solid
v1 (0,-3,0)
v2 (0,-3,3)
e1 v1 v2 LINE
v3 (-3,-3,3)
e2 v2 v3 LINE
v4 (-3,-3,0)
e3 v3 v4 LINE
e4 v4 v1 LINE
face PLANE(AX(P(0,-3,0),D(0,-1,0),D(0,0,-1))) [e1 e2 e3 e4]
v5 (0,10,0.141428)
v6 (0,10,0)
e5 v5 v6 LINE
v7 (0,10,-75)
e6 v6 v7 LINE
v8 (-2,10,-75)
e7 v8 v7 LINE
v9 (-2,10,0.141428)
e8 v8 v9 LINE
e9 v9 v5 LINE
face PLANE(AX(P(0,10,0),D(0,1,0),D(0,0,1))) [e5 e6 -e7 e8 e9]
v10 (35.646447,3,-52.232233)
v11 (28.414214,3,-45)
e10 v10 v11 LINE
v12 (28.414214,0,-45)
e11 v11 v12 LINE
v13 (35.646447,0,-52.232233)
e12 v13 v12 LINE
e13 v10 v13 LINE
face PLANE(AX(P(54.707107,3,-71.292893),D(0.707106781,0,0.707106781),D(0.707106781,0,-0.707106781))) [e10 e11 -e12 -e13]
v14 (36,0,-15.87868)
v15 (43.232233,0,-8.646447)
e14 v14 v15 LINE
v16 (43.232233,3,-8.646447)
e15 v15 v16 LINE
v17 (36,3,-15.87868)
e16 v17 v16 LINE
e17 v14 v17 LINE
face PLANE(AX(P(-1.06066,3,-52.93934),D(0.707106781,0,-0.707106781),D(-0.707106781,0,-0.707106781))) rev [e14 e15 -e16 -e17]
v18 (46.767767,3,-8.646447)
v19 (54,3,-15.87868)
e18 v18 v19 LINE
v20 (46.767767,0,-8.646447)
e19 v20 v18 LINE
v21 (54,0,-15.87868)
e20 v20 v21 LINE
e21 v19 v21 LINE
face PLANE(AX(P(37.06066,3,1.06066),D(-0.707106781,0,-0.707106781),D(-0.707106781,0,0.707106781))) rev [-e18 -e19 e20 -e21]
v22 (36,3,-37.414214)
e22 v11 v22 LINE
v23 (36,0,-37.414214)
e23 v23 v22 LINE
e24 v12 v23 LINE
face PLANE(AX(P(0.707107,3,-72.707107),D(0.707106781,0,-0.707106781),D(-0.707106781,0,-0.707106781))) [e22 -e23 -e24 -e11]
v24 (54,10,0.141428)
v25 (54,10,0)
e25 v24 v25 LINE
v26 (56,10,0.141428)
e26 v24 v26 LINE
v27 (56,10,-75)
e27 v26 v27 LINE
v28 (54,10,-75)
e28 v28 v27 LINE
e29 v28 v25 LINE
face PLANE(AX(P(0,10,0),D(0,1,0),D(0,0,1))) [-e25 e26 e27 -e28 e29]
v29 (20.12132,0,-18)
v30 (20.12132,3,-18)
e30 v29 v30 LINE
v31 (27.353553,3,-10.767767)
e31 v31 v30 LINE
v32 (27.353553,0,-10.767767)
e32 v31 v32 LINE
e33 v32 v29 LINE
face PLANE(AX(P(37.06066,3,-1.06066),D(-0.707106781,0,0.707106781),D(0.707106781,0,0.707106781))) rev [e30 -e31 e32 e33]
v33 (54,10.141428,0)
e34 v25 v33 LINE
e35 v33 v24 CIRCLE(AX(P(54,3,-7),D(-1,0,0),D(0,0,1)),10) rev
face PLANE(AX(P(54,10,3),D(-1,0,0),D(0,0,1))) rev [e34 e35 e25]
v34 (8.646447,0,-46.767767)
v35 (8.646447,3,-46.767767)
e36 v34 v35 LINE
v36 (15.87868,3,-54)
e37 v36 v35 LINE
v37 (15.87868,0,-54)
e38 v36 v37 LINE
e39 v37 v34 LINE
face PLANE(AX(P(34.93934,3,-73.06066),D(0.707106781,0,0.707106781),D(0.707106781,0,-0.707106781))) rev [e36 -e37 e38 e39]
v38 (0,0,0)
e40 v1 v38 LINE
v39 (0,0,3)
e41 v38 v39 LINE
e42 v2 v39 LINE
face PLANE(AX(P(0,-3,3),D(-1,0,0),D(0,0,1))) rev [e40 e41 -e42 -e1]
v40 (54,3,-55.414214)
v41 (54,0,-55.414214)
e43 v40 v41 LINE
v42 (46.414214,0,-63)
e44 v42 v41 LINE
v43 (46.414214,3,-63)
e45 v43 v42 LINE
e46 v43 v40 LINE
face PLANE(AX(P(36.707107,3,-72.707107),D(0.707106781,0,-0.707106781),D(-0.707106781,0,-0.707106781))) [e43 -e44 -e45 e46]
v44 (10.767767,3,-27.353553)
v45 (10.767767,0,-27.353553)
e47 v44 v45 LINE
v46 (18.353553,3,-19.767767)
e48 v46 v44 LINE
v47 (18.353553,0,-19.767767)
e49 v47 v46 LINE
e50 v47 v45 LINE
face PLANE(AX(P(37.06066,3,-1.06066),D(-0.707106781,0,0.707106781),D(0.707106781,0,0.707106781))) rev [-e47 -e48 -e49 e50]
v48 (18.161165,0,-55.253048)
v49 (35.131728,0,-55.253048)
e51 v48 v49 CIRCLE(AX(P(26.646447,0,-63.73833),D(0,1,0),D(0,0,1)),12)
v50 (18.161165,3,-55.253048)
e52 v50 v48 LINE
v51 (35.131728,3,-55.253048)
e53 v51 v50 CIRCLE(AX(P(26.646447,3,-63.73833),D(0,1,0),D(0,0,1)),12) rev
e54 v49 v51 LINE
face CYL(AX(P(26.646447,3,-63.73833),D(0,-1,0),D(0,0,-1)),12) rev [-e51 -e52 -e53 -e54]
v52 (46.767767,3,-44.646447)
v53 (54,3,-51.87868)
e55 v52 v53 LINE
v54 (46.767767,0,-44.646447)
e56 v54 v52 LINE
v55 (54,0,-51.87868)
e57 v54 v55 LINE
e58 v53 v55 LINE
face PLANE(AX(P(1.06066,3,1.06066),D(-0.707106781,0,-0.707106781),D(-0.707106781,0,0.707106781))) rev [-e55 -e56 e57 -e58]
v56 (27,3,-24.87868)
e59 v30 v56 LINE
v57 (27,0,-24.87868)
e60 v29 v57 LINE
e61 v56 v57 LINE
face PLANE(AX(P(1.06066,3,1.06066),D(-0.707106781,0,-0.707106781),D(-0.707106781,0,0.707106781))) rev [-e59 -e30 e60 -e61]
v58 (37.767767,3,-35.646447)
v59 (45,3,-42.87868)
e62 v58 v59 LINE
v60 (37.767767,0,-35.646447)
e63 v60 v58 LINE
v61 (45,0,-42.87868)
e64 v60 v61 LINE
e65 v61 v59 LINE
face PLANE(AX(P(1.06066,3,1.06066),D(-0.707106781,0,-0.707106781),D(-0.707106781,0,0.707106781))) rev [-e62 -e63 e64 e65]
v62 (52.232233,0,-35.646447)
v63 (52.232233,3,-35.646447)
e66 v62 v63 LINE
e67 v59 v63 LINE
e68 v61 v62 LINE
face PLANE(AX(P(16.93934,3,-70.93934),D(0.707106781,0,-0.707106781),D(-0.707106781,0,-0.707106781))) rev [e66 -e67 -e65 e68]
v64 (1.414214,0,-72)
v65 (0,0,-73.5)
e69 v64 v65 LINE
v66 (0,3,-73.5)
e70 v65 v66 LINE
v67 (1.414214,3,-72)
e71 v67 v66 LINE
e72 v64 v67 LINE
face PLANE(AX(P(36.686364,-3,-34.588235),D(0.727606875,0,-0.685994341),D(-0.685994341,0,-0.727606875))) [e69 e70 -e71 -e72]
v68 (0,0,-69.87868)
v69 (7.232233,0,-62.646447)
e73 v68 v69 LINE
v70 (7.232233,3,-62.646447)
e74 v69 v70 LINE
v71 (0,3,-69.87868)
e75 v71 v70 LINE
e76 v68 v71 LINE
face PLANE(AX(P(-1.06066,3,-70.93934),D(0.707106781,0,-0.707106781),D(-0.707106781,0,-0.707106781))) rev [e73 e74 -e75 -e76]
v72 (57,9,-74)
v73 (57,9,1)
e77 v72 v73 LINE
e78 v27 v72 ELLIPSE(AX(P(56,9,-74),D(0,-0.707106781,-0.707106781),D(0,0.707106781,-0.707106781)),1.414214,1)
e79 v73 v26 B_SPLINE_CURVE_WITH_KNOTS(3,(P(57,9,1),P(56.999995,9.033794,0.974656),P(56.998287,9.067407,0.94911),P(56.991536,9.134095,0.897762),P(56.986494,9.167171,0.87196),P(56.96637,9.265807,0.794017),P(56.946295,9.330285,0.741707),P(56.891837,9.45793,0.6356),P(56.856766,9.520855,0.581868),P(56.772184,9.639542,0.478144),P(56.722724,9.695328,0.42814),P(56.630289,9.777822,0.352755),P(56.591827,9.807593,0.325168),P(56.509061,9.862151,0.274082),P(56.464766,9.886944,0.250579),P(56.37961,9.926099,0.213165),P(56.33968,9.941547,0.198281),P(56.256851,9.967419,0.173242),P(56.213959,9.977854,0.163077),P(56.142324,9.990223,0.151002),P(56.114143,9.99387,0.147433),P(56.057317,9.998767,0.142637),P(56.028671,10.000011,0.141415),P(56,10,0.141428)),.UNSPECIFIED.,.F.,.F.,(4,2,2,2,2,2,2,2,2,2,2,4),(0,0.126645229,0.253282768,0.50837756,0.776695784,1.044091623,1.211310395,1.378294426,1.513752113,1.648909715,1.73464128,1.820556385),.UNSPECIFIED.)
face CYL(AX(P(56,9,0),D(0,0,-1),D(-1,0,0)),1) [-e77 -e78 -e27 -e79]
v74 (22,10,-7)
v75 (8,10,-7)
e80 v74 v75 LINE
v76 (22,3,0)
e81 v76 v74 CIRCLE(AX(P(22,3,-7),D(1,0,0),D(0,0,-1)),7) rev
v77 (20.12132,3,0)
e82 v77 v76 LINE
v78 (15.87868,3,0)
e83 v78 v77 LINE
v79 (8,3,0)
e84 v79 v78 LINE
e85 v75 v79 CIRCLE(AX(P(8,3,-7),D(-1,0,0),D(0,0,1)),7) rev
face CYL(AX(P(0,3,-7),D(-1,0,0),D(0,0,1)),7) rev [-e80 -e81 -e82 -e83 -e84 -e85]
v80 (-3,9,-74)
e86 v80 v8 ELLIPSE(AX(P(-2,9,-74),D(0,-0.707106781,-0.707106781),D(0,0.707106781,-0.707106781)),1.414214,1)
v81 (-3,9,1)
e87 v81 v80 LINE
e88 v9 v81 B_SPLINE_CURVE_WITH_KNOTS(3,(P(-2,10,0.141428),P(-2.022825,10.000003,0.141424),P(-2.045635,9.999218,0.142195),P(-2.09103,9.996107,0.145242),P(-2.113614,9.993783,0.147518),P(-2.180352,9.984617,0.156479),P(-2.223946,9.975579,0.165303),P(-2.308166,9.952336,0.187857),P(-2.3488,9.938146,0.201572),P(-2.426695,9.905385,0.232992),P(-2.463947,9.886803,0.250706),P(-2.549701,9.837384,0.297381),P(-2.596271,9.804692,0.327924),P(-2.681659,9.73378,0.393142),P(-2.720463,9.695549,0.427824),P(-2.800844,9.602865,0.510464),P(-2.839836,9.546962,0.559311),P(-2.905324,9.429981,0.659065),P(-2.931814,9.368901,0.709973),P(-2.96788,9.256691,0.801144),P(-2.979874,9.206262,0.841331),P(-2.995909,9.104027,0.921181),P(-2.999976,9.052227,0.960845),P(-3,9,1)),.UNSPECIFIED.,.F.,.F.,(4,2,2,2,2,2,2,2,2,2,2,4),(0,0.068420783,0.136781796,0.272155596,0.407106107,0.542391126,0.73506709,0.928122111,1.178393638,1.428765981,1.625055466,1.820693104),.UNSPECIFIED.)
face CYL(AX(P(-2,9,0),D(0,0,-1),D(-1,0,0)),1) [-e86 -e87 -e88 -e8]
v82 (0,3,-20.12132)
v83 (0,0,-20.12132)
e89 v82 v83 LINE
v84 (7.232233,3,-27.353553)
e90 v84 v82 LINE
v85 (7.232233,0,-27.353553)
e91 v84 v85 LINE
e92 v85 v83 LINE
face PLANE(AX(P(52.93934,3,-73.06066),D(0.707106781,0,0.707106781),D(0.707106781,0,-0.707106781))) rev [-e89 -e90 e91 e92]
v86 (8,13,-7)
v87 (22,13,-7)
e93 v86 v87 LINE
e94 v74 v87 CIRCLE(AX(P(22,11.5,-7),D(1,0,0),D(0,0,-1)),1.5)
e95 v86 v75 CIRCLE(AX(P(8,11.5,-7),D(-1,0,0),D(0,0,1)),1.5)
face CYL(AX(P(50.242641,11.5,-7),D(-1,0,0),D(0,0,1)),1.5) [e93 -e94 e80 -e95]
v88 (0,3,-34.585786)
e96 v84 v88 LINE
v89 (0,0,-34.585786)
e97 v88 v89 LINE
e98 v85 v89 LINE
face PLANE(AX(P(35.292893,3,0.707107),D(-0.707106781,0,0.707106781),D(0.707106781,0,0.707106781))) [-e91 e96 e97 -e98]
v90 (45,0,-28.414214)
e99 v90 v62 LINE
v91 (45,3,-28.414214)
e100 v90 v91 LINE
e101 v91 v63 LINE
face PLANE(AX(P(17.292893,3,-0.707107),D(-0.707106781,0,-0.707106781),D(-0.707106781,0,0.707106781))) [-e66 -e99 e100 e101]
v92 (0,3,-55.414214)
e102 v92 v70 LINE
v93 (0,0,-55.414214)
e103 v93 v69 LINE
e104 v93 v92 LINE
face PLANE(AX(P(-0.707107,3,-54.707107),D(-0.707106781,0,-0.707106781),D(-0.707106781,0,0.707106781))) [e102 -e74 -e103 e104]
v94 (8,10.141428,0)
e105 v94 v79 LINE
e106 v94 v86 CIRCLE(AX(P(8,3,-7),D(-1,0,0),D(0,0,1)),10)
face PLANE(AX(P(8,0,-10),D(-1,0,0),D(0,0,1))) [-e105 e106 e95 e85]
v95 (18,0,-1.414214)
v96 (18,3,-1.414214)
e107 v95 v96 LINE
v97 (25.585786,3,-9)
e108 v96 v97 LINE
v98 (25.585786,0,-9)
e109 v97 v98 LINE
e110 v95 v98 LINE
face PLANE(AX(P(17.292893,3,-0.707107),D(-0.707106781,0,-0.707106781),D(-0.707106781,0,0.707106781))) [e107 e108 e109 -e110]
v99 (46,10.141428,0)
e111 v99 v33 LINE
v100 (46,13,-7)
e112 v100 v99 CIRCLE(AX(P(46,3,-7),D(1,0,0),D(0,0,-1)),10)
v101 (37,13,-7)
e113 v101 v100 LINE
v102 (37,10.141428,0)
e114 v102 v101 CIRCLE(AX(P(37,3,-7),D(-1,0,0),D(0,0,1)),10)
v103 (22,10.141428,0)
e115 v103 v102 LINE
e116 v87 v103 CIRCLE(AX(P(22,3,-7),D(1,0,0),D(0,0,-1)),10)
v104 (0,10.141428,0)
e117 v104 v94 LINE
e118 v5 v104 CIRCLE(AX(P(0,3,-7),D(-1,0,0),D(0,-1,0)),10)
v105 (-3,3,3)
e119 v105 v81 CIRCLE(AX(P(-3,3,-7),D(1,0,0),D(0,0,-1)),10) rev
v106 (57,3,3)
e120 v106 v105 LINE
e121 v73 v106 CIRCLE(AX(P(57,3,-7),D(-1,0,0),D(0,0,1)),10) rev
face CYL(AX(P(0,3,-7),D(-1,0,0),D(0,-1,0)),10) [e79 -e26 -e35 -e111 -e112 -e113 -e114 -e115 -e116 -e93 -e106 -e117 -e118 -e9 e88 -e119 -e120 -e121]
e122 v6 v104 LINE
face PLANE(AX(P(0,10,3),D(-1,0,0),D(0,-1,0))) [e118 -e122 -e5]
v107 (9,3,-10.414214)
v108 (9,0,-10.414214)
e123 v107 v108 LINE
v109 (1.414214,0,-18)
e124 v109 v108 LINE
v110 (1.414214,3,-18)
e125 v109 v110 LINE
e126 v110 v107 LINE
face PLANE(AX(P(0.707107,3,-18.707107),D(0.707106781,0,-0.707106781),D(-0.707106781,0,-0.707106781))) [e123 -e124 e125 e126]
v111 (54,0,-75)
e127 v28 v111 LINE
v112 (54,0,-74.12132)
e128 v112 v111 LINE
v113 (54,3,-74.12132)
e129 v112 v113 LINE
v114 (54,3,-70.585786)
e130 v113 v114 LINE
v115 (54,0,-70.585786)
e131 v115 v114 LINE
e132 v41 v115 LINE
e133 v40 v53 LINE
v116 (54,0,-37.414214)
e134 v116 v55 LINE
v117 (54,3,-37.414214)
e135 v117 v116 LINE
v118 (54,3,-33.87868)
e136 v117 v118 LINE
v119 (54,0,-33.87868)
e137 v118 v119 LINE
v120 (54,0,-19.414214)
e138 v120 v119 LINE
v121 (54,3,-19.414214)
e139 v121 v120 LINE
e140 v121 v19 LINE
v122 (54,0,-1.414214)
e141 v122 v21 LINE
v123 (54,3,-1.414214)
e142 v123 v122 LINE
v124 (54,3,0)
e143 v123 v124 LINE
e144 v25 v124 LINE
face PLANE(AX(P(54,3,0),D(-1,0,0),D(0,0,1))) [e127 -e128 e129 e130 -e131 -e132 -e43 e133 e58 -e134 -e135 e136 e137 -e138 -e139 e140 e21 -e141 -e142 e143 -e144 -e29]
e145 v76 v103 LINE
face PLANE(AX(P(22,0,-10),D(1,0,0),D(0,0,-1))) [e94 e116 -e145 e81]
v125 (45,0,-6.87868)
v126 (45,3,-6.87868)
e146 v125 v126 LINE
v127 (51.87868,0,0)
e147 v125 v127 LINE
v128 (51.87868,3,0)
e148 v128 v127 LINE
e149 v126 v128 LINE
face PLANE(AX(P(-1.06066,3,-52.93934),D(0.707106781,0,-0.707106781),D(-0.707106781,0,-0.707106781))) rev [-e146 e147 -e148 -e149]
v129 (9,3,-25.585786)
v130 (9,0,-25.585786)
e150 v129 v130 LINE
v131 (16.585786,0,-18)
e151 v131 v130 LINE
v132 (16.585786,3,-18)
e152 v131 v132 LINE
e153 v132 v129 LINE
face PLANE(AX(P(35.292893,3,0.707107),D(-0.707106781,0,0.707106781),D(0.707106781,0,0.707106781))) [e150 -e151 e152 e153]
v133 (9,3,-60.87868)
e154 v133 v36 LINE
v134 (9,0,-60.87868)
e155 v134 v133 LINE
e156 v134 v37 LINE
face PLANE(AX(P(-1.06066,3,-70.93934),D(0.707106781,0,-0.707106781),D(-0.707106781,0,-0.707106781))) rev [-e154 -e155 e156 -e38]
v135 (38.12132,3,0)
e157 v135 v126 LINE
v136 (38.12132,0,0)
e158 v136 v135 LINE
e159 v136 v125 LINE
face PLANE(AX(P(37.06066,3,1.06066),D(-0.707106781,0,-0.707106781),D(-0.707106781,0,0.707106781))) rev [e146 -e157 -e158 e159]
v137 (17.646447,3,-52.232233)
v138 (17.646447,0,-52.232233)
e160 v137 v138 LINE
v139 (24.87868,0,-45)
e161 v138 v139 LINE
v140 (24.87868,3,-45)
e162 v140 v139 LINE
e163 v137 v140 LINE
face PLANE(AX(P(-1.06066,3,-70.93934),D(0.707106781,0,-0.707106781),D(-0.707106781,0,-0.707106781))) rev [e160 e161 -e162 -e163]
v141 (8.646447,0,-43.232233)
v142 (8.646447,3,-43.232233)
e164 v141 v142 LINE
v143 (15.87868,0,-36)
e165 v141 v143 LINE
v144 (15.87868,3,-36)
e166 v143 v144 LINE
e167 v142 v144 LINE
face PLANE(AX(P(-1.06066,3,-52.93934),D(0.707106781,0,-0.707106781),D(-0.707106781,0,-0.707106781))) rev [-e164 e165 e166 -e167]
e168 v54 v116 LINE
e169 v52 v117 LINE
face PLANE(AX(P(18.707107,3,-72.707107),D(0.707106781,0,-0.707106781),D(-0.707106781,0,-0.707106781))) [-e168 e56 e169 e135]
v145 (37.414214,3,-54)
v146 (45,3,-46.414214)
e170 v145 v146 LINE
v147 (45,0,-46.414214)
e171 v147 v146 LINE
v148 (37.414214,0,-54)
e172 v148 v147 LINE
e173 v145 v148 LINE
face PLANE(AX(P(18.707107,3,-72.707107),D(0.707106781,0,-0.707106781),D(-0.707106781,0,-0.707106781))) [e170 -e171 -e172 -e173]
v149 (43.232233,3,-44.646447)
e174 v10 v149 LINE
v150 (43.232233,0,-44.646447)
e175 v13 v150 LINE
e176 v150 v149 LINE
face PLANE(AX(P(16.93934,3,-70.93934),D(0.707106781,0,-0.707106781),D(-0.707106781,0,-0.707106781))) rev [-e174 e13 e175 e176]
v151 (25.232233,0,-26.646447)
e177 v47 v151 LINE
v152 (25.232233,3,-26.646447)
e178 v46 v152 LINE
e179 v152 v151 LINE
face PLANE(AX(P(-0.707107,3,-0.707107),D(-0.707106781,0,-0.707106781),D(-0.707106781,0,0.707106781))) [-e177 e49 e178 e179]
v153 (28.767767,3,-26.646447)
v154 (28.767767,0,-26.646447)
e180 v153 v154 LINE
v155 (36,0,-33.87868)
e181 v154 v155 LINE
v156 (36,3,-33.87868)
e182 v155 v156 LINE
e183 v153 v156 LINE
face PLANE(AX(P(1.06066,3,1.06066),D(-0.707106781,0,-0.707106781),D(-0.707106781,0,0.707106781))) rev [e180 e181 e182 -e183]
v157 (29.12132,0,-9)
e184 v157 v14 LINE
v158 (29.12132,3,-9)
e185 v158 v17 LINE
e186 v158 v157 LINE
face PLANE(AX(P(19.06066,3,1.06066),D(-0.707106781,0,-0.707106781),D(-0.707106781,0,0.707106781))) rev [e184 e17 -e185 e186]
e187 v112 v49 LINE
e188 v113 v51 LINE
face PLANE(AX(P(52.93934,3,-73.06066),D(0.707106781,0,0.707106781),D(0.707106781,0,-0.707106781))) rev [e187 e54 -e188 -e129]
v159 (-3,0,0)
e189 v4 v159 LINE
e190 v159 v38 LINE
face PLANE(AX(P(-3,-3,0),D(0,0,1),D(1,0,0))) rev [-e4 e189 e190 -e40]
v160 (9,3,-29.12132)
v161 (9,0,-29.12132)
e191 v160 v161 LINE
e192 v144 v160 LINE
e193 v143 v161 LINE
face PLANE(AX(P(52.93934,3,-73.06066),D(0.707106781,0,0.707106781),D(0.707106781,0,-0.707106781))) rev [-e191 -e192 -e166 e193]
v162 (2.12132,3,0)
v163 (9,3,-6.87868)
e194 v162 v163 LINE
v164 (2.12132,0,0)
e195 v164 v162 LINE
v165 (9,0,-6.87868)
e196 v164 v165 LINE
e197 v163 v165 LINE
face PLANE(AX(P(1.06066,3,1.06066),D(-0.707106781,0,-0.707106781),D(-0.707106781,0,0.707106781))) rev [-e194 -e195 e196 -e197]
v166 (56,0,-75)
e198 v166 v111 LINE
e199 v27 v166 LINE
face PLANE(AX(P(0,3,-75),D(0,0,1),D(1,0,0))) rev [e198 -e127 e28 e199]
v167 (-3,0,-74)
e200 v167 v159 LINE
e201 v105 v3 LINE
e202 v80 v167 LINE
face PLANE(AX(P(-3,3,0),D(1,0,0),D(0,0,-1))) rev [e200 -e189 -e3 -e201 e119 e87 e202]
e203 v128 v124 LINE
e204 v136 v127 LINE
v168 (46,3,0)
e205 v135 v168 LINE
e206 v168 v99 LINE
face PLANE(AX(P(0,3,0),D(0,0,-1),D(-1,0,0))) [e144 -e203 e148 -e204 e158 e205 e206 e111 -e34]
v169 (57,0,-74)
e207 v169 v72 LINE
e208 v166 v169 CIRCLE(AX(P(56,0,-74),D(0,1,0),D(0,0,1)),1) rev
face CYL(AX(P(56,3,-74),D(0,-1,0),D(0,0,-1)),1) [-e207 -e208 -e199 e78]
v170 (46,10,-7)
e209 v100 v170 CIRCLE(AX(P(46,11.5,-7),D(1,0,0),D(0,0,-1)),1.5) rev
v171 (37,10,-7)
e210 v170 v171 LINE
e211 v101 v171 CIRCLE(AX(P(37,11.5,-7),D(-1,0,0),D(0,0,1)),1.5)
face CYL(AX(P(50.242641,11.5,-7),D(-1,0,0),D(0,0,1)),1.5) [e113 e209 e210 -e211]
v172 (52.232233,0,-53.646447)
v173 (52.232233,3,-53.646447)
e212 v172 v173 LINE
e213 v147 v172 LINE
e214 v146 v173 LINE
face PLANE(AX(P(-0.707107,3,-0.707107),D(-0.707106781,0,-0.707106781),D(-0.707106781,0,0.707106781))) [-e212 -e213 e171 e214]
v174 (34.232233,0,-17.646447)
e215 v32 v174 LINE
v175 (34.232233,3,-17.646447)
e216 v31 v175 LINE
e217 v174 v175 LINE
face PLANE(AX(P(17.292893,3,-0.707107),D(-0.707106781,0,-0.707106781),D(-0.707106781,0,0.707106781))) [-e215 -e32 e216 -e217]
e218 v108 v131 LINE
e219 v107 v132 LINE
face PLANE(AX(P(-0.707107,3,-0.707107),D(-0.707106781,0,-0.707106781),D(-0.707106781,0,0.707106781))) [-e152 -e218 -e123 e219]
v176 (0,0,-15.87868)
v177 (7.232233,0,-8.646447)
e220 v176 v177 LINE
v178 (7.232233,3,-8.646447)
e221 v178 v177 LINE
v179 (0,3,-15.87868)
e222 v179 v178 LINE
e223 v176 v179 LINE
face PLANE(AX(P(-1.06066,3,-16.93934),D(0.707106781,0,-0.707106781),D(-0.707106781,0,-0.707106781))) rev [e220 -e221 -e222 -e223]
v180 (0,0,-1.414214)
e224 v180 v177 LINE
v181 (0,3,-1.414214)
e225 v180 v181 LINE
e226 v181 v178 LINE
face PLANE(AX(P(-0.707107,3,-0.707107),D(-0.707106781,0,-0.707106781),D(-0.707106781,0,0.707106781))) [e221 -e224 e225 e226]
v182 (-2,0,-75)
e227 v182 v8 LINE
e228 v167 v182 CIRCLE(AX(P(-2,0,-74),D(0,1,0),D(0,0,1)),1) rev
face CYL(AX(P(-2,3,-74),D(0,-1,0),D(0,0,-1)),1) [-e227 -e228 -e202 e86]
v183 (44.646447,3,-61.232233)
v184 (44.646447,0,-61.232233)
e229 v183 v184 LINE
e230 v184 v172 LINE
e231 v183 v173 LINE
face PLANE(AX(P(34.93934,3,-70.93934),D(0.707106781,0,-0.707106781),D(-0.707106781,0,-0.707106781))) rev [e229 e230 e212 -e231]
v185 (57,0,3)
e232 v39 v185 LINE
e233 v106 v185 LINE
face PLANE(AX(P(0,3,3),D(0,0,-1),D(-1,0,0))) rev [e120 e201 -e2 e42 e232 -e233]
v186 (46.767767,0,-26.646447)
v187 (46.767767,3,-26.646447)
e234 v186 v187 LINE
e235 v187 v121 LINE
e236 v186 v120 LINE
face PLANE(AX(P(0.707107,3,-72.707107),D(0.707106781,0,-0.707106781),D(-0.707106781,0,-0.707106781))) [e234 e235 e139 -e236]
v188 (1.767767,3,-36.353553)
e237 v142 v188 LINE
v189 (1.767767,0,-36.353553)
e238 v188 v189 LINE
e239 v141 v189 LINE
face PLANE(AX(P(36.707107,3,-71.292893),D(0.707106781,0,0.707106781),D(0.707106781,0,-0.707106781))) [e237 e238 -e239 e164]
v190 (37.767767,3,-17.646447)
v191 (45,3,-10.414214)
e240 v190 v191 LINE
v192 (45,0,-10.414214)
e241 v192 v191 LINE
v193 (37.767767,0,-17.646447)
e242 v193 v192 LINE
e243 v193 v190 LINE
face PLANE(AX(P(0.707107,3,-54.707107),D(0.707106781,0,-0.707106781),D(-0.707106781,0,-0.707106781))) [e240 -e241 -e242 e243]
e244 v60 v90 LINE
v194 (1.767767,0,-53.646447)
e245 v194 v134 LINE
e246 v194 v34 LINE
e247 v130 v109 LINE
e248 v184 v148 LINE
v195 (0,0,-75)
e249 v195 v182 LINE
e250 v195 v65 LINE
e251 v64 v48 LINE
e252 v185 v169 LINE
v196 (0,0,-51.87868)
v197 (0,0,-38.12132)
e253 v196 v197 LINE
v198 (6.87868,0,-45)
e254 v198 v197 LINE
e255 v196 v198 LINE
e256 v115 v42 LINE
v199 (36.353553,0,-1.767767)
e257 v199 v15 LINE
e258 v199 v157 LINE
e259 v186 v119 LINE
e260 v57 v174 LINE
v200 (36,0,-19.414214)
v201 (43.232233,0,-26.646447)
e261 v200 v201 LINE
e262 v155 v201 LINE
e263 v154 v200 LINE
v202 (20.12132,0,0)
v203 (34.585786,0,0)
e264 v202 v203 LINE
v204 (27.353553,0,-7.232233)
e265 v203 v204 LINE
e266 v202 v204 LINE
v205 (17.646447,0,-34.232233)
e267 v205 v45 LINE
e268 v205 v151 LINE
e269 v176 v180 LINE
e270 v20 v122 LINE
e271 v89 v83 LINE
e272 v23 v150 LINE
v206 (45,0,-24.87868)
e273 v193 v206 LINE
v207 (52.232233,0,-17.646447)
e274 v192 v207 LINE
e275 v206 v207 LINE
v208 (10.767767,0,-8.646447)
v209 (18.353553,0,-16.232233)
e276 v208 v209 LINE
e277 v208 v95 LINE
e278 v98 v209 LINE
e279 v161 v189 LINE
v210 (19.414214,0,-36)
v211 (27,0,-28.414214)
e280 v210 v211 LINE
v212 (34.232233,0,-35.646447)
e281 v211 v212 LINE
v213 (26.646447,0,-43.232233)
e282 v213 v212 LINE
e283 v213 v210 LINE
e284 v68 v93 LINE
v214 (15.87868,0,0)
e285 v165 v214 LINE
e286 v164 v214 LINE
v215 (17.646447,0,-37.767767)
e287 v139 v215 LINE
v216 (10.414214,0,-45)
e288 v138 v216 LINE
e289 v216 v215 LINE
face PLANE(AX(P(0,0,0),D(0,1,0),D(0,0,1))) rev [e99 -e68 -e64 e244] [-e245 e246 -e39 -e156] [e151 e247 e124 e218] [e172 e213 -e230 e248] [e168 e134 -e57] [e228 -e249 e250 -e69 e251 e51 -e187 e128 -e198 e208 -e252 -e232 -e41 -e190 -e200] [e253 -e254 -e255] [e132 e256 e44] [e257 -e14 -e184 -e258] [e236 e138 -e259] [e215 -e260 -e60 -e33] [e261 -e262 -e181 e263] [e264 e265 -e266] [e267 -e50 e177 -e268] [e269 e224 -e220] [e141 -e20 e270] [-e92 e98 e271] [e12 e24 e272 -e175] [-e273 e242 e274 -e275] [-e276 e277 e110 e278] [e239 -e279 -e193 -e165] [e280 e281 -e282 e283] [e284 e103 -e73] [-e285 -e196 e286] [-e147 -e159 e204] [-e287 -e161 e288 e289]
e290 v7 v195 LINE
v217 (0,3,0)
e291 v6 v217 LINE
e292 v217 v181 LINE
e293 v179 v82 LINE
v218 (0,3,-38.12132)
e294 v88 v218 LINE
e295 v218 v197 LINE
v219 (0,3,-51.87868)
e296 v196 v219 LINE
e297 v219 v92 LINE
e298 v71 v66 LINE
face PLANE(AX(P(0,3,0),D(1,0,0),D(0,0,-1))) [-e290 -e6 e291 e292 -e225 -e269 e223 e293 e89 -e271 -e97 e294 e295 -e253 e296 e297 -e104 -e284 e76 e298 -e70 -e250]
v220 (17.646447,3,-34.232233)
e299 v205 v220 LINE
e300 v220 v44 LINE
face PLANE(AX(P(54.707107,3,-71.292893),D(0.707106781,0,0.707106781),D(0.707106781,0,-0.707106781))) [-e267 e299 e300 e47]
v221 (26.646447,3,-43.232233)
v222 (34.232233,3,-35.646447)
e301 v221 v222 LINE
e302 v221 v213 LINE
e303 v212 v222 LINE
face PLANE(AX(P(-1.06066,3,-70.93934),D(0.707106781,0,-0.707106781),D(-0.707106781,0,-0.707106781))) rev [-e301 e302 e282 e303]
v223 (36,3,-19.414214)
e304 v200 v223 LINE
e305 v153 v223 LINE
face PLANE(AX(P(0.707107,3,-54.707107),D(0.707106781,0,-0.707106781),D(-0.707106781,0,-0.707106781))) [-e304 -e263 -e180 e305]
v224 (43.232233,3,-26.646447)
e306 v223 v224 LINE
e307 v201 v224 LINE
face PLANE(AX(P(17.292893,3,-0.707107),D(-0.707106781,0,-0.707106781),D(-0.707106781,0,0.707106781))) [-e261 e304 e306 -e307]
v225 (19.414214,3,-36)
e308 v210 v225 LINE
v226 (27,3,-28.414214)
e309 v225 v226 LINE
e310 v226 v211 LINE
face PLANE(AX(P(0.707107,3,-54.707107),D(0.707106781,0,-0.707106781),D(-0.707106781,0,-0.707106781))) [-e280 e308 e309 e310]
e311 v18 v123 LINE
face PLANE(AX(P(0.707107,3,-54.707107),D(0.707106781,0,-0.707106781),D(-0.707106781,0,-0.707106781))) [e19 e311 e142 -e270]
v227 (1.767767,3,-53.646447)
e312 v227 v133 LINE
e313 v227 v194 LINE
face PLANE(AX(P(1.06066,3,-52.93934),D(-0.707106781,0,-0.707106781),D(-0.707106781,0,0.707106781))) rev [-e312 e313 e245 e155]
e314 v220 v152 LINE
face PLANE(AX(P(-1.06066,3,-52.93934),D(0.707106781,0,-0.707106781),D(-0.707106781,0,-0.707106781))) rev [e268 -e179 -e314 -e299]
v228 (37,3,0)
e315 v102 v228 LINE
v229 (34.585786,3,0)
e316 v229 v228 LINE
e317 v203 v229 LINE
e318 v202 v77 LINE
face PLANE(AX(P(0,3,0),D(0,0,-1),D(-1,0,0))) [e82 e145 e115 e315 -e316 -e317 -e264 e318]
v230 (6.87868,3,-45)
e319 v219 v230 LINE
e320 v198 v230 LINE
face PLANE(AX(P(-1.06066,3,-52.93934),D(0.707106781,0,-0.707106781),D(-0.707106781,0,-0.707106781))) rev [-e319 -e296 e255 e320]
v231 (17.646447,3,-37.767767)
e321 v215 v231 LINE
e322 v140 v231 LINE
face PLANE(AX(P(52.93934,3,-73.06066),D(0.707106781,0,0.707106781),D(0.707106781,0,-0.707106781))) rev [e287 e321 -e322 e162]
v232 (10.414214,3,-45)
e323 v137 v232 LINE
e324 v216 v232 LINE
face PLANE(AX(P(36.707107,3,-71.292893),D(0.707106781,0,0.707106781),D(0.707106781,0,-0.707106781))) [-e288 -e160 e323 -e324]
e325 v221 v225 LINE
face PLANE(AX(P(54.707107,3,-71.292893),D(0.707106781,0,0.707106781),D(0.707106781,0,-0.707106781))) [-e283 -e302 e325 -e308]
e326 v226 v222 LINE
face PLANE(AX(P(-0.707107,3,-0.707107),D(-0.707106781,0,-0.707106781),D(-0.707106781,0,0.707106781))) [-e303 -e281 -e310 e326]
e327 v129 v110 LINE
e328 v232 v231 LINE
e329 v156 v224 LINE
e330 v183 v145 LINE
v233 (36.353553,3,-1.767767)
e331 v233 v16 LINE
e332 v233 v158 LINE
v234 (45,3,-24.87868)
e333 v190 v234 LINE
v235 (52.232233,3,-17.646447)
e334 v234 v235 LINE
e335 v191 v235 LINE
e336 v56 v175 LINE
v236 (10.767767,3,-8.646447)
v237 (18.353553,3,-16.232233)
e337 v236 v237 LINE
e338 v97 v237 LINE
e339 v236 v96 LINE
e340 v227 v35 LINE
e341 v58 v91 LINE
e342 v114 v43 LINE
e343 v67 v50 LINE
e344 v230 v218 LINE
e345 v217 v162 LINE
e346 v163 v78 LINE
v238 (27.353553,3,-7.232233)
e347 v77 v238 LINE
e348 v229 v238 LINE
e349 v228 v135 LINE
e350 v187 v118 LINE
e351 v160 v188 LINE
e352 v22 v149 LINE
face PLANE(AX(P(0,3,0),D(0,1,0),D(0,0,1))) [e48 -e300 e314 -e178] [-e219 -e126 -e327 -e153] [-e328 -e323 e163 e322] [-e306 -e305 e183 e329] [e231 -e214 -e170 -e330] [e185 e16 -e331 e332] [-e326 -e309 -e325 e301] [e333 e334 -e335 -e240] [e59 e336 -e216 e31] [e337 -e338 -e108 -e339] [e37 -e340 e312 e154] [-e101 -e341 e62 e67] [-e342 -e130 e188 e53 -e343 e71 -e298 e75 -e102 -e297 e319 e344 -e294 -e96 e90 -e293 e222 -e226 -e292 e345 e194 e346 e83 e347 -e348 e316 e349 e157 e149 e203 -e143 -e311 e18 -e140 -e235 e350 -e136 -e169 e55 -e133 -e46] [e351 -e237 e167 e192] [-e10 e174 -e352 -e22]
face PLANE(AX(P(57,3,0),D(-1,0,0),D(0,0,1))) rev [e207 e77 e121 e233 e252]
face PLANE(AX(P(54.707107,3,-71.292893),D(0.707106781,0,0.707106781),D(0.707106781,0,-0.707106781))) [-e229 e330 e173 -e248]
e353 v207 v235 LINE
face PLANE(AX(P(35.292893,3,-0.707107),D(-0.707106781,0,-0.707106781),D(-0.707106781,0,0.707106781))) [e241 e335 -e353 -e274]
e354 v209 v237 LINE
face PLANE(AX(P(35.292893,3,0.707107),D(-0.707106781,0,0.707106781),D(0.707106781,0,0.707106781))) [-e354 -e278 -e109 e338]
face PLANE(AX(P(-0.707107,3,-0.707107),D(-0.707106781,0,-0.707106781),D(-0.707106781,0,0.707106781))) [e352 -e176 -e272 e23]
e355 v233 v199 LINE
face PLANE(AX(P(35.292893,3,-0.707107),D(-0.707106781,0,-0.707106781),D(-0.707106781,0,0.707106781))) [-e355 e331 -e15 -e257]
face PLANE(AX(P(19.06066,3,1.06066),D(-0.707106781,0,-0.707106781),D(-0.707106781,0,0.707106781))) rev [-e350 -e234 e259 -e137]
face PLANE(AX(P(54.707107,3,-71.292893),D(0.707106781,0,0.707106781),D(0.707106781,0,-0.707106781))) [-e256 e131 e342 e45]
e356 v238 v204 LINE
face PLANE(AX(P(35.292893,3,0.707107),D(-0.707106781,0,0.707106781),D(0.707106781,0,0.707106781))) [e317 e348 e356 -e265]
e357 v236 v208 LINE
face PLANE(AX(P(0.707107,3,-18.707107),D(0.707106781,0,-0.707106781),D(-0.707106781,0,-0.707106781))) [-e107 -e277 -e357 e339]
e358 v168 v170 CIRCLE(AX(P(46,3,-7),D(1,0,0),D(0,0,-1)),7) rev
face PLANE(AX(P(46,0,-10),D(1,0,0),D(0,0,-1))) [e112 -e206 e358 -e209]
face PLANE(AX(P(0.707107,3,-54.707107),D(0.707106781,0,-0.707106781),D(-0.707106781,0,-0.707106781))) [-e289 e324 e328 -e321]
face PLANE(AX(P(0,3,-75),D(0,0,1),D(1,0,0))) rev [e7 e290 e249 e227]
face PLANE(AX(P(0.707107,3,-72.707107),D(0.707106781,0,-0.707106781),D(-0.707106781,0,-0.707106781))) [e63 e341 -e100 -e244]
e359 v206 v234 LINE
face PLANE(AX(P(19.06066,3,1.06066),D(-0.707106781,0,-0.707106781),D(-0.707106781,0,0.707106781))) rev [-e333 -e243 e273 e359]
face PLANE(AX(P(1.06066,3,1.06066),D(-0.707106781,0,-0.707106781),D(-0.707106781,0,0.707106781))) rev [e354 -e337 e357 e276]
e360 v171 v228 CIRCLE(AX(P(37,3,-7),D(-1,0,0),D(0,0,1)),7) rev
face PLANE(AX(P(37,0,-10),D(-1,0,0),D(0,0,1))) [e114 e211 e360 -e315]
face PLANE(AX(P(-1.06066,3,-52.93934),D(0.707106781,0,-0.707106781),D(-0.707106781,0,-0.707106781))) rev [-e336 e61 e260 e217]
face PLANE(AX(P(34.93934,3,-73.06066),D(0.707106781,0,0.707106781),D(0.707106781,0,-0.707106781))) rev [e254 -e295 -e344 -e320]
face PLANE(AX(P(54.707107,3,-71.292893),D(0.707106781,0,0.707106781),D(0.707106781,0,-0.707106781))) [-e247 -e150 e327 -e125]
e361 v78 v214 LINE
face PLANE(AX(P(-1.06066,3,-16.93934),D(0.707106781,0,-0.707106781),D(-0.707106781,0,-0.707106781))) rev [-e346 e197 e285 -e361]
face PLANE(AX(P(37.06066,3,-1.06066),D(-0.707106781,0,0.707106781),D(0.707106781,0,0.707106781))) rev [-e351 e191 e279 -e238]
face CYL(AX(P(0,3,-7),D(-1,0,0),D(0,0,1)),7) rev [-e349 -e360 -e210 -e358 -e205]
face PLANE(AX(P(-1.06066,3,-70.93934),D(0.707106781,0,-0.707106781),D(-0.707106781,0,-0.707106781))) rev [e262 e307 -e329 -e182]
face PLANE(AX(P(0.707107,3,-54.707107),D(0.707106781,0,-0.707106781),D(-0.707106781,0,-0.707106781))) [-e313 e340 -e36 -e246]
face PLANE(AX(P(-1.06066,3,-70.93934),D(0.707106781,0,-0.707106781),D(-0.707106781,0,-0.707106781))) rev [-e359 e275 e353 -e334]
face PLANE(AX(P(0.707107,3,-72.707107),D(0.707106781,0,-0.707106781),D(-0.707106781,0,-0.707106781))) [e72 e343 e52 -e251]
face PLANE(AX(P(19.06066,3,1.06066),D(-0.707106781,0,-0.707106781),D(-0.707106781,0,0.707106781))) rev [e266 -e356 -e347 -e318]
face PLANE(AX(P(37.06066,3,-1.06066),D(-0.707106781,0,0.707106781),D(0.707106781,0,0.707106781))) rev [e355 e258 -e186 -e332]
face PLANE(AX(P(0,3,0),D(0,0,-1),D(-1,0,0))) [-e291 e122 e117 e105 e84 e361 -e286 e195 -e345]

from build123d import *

# Parameters (mm, degrees)
SKETCH1_W               = 60
SKETCH1_H               = 78
SKETCH1_W_2             = 54
SKETCH1_H_2             = 72
EXTRUDE_THIN1_DEPTH     = 3
EXTRUDE_THIN2_DEPTH     = 3
BOSS_EXTRUDE1_DEPTH     = 7
SKETCH5_W               = 9
SKETCH5_H               = 3
BOSS_EXTRUDE2_DEPTH     = 10
SKETCH5_W_2             = 14
BOSS_EXTRUDE2_2_DEPTH   = 10
SKETCH6_W               = 3
SKETCH6_H               = 3
BOSS_EXTRUDE3_DEPTH     = 3
CUT_EXTRUDE1_DEPTH      = 95.731198662
SKETCH9_W               = 54
SKETCH9_H               = 3
BOSS_EXTRUDE4_DEPTH     = 3
FILLET1_R               = 7
FILLET2_R               = 10
CUT_EXTRUDE2_REACH      = 92.526
CUT_EXTRUDE3_DEPTH      = 97.922649572
CUT_EXTRUDE3_DEPTH_BACK = 97.922649572
SKETCH11_W              = 3
SKETCH11_H              = 3
FILLET3_R               = 1
CUT_EXTRUDE4_DEPTH      = 95.731198812
FILLET4_R               = 12
SKETCH14_W              = 3
SKETCH14_H              = 3
BOSS_EXTRUDE5_DEPTH     = 3


# Read off the part's stored shape, not the designer's step: Extrude-Thin2
# Some blends are built 0.0001 mm under size
with BuildPart() as part:
    # Sketch1 → Extrude-Thin1 (new body)
    with BuildSketch(Plane(origin=(0, 0, 0), x_dir=(1, 0, 0), z_dir=(0, 1, 0))):
        with Locations((27, 36)):
            Rectangle(SKETCH1_W, SKETCH1_H)
        with Locations((27, 36)):
            Rectangle(SKETCH1_W_2, SKETCH1_H_2, mode=Mode.SUBTRACT)
    extrude(amount=EXTRUDE_THIN1_DEPTH)

    # Extrude-Thin2 outline → Extrude-Thin2 (add)
    with BuildSketch(Plane(origin=(0, 0, 0), x_dir=(1, 0, 0), z_dir=(0, 1, 0))):
        Polygon((0, 69.878679656), (7.232233047, 62.646446609), (0, 55.414213562), (0, 51.878679656), (6.878679656, 45), (0, 38.121320344), (0, 34.585786438), (7.232233047, 27.353553391), (0, 20.121320344), (0, 15.878679656), (7.232233047, 8.646446609), (0, 1.414213562), (0, 0), (2.121320344, 0), (9, 6.878679656), (15.878679656, 0), (20.121320344, 0), (27.353553391, 7.232233047), (34.585786438, 0), (38.121320344, 0), (45, 6.878679656), (51.878679656, 0), (54, 0), (54, 1.414213562), (46.767766953, 8.646446609), (54, 15.878679656), (54, 19.414213562), (46.767766953, 26.646446609), (54, 33.878679656), (54, 37.414213562), (46.767766953, 44.646446609), (54, 51.878679656), (54, 55.414213562), (46.414213562, 63), (54, 70.585786438), (54, 72), (51.878679656, 72), (44.646446609, 64.767766953), (37.414213562, 72), (33.878679656, 72), (26.646446609, 64.767766953), (19.414213562, 72), (16.585786438, 72), (9, 64.414213562), (1.414213562, 72), (0, 72), align=None)
        Polygon((10.767766953, 8.646446609), (18.353553391, 16.232233047), (25.585786438, 9), (18, 1.414213562), align=None, mode=Mode.SUBTRACT)
        Polygon((9, 10.414213562), (1.414213562, 18), (9, 25.585786438), (16.585786438, 18), align=None, mode=Mode.SUBTRACT)
        Polygon((18.353553391, 19.767766953), (10.767766953, 27.353553391), (17.646446609, 34.232233047), (25.232233047, 26.646446609), align=None, mode=Mode.SUBTRACT)
        Polygon((26.646446609, 43.232233047), (34.232233047, 35.646446609), (27, 28.414213562), (19.414213562, 36), align=None, mode=Mode.SUBTRACT)
        Polygon((29.121320344, 9), (36, 15.878679656), (43.232233047, 8.646446609), (36.353553391, 1.767766953), align=None, mode=Mode.SUBTRACT)
        Polygon((20.121320344, 18), (27, 24.878679656), (34.232233047, 17.646446609), (27.353553391, 10.767766953), align=None, mode=Mode.SUBTRACT)
        Polygon((45, 24.878679656), (52.232233047, 17.646446609), (45, 10.414213562), (37.767766953, 17.646446609), align=None, mode=Mode.SUBTRACT)
        Polygon((36, 33.878679656), (43.232233047, 26.646446609), (36, 19.414213562), (28.767766953, 26.646446609), align=None, mode=Mode.SUBTRACT)
        Polygon((52.232233047, 35.646446609), (45, 28.414213562), (37.767766953, 35.646446609), (45, 42.878679656), align=None, mode=Mode.SUBTRACT)
        Polygon((15.878679656, 36), (9, 29.121320344), (1.767766953, 36.353553391), (8.646446609, 43.232233047), align=None, mode=Mode.SUBTRACT)
        Polygon((9, 60.878679656), (15.878679656, 54), (8.646446609, 46.767766953), (1.767766953, 53.646446609), align=None, mode=Mode.SUBTRACT)
        Polygon((17.646446609, 52.232233047), (24.878679656, 45), (17.646446609, 37.767766953), (10.414213562, 45), align=None, mode=Mode.SUBTRACT)
        Polygon((24.878679656, 63), (17.646446609, 55.767766953), (10.767766953, 62.646446609), (18, 69.878679656), align=None, mode=Mode.SUBTRACT)
        Polygon((33.878679656, 54), (26.646446609, 46.767766953), (19.414213562, 54), (26.646446609, 61.232233047), align=None, mode=Mode.SUBTRACT)
        Polygon((43.232233047, 44.646446609), (36, 37.414213562), (28.414213562, 45), (35.646446609, 52.232233047), align=None, mode=Mode.SUBTRACT)
        Polygon((45, 46.414213562), (37.414213562, 54), (44.646446609, 61.232233047), (52.232233047, 53.646446609), align=None, mode=Mode.SUBTRACT)
        Polygon((42.878679656, 63), (35.646446609, 55.767766953), (28.414213562, 63), (35.646446609, 70.232233047), align=None, mode=Mode.SUBTRACT)
    extrude(amount=EXTRUDE_THIN2_DEPTH)

    # Sketch4 → Boss-Extrude1 (add)
    with BuildSketch(Plane(origin=(0, 3, 0), x_dir=(1, 0, 0), z_dir=(0, 1, 0))):
        Polygon((0, 0), (0, 72), (0, 75), (-3, 75), (-3, -3), (57, -3), (57, 75), (54, 75), (54, 72), (54, 0), align=None)
    extrude(amount=BOSS_EXTRUDE1_DEPTH)

    # Sketch6 → Boss-Extrude3 (add)
    with BuildSketch(Plane.XZ):
        with Locations((-1.5, 1.5)):
            Rectangle(SKETCH6_W, SKETCH6_H)
    extrude(amount=BOSS_EXTRUDE3_DEPTH)

    # Sketch7 → Cut-Extrude1 (cut, through all)
    with BuildSketch(Plane(origin=(0, 3, 0), x_dir=(1, 0, 0), z_dir=(0, 1, 0))):
        Polygon((33.878679656, 72), (36.878679656, 75), (16.414213562, 75), (0, 75), (0, 73.5), (1.414213562, 72), (17.646446609, 55.767766953), (26.646446609, 64.767766953), align=None)
    extrude(amount=-CUT_EXTRUDE1_DEPTH, mode=Mode.SUBTRACT)



with BuildPart() as body_2:
    # Sketch5 → Boss-Extrude2 (new body)
    with BuildSketch(Plane(origin=(0, 0, 0), x_dir=(-1, 0, 0), z_dir=(0, 0, -1))):
        with Locations((-41.5, 11.5)):
            Rectangle(SKETCH5_W, SKETCH5_H)
    extrude(amount=BOSS_EXTRUDE2_DEPTH)


with BuildPart() as body_3:
    # Sketch5 → Boss-Extrude2 2 (new body)
    with BuildSketch(Plane(origin=(0, 0, 0), x_dir=(-1, 0, 0), z_dir=(0, 0, -1))):
        with Locations((-15, 11.5)):
            Rectangle(SKETCH5_W_2, SKETCH5_H)
    extrude(amount=BOSS_EXTRUDE2_2_DEPTH)


with BuildPart() as part_1:
    add(part.part)

    add(body_2.part)  # Boss-Extrude4 merges body 2

    add(body_3.part)  # Boss-Extrude4 merges body 3
    # Sketch9 → Boss-Extrude4 (add)
    with BuildSketch(Plane.XY):
        with Locations((27, 11.5)):
            Rectangle(SKETCH9_W, SKETCH9_H)
    extrude(amount=BOSS_EXTRUDE4_DEPTH)

    # Fillet1
    fillet1_edges = [part_1.edges().sort_by_distance(p)[0] for p in [
        (41.5, 10, 0),
        (15, 10, 0),
    ]]
    fillet(fillet1_edges, radius=FILLET1_R - 0.0001)  # a hair under: the kernel refuses the full size

    # Fillet2
    # the kernel refuses this fillet: 10 mm, written as the material it takes off along each edge
    with BuildSketch(Plane(origin=(79, 13, 3), x_dir=(0, -1, 0), z_dir=(-1, 0, 0))) as fillet2_piece_1:
        with BuildLine():
            CenterArc((FILLET2_R, -FILLET2_R), FILLET2_R, 90, 90)
            Line((0, -FILLET2_R), (0, 0))
            Line((0, 0), (FILLET2_R, 0))
        make_face()
    extrude(amount=104, mode=Mode.SUBTRACT)

    # Sketch10 → Cut-Extrude2 (cut, up to next)
    with BuildSketch(Plane.ZY.offset(-8), mode=Mode.PRIVATE) as cut_extrude2_sk1:
        with BuildLine():
            ThreePointArc((-7, 10), (-8.5, 11.5), (-7, 13))
            Line((-7, 13), (-10, 13))
            Line((-10, 13), (-10, 10))
            Line((-10, 10), (-7, 10))
        make_face()
    cut_extrude2_tool1 = extrude(cut_extrude2_sk1.sketch, amount=-CUT_EXTRUDE2_REACH, mode=Mode.PRIVATE) & part_1.part
    add(cut_extrude2_tool1.solids().sort_by_distance((8, 11.5, -9.058288))[0], mode=Mode.SUBTRACT)
    add(cut_extrude2_tool1.solids().sort_by_distance((8, 11.5, -9.058288))[1], mode=Mode.SUBTRACT)

    # Sketch11 → Cut-Extrude3 (cut, two sides: drawn at the far end of the back side and taken through both)
    with BuildSketch(Plane.ZY.offset(3).offset(-CUT_EXTRUDE3_DEPTH_BACK)):
        with Locations((1.5, -1.5)):
            Rectangle(SKETCH11_W, SKETCH11_H)
    extrude(amount=CUT_EXTRUDE3_DEPTH + CUT_EXTRUDE3_DEPTH_BACK, mode=Mode.SUBTRACT)

    # Fillet3
    fillet3_edges = [part_1.edges().sort_by_distance(p)[0] for p in [
        (57, 10, -37.429285786),
        (-3, 10, -37.429285786),
        (-3, 5, -75),
        (57, 5, -75),
    ]]
    fillet(fillet3_edges, radius=FILLET3_R)

    # Sketch12 → Cut-Extrude4 (cut, through all)
    with BuildSketch(Plane(origin=(0, 3, 0), x_dir=(1, 0, 0), z_dir=(0, 1, 0))):
        Polygon((17.646446609, 55.767766953), (26.646446609, 46.767766953), (54, 74.121320344), (54, 75), (17.646446609, 75), align=None)
    extrude(amount=-CUT_EXTRUDE4_DEPTH, mode=Mode.SUBTRACT)

    # Fillet4
    fillet4_edges = [part_1.edges().sort_by_distance(p)[0] for p in [
        (26.646446609, 1.5, -46.767766953),
    ]]
    fillet(fillet4_edges, radius=FILLET4_R)

    # Sketch14 → Boss-Extrude5 (add)
    with BuildSketch(Plane.XZ):
        with Locations((-1.5, 1.5)):
            Rectangle(SKETCH14_W, SKETCH14_H)
    extrude(amount=BOSS_EXTRUDE5_DEPTH)


solid = part_1.part
